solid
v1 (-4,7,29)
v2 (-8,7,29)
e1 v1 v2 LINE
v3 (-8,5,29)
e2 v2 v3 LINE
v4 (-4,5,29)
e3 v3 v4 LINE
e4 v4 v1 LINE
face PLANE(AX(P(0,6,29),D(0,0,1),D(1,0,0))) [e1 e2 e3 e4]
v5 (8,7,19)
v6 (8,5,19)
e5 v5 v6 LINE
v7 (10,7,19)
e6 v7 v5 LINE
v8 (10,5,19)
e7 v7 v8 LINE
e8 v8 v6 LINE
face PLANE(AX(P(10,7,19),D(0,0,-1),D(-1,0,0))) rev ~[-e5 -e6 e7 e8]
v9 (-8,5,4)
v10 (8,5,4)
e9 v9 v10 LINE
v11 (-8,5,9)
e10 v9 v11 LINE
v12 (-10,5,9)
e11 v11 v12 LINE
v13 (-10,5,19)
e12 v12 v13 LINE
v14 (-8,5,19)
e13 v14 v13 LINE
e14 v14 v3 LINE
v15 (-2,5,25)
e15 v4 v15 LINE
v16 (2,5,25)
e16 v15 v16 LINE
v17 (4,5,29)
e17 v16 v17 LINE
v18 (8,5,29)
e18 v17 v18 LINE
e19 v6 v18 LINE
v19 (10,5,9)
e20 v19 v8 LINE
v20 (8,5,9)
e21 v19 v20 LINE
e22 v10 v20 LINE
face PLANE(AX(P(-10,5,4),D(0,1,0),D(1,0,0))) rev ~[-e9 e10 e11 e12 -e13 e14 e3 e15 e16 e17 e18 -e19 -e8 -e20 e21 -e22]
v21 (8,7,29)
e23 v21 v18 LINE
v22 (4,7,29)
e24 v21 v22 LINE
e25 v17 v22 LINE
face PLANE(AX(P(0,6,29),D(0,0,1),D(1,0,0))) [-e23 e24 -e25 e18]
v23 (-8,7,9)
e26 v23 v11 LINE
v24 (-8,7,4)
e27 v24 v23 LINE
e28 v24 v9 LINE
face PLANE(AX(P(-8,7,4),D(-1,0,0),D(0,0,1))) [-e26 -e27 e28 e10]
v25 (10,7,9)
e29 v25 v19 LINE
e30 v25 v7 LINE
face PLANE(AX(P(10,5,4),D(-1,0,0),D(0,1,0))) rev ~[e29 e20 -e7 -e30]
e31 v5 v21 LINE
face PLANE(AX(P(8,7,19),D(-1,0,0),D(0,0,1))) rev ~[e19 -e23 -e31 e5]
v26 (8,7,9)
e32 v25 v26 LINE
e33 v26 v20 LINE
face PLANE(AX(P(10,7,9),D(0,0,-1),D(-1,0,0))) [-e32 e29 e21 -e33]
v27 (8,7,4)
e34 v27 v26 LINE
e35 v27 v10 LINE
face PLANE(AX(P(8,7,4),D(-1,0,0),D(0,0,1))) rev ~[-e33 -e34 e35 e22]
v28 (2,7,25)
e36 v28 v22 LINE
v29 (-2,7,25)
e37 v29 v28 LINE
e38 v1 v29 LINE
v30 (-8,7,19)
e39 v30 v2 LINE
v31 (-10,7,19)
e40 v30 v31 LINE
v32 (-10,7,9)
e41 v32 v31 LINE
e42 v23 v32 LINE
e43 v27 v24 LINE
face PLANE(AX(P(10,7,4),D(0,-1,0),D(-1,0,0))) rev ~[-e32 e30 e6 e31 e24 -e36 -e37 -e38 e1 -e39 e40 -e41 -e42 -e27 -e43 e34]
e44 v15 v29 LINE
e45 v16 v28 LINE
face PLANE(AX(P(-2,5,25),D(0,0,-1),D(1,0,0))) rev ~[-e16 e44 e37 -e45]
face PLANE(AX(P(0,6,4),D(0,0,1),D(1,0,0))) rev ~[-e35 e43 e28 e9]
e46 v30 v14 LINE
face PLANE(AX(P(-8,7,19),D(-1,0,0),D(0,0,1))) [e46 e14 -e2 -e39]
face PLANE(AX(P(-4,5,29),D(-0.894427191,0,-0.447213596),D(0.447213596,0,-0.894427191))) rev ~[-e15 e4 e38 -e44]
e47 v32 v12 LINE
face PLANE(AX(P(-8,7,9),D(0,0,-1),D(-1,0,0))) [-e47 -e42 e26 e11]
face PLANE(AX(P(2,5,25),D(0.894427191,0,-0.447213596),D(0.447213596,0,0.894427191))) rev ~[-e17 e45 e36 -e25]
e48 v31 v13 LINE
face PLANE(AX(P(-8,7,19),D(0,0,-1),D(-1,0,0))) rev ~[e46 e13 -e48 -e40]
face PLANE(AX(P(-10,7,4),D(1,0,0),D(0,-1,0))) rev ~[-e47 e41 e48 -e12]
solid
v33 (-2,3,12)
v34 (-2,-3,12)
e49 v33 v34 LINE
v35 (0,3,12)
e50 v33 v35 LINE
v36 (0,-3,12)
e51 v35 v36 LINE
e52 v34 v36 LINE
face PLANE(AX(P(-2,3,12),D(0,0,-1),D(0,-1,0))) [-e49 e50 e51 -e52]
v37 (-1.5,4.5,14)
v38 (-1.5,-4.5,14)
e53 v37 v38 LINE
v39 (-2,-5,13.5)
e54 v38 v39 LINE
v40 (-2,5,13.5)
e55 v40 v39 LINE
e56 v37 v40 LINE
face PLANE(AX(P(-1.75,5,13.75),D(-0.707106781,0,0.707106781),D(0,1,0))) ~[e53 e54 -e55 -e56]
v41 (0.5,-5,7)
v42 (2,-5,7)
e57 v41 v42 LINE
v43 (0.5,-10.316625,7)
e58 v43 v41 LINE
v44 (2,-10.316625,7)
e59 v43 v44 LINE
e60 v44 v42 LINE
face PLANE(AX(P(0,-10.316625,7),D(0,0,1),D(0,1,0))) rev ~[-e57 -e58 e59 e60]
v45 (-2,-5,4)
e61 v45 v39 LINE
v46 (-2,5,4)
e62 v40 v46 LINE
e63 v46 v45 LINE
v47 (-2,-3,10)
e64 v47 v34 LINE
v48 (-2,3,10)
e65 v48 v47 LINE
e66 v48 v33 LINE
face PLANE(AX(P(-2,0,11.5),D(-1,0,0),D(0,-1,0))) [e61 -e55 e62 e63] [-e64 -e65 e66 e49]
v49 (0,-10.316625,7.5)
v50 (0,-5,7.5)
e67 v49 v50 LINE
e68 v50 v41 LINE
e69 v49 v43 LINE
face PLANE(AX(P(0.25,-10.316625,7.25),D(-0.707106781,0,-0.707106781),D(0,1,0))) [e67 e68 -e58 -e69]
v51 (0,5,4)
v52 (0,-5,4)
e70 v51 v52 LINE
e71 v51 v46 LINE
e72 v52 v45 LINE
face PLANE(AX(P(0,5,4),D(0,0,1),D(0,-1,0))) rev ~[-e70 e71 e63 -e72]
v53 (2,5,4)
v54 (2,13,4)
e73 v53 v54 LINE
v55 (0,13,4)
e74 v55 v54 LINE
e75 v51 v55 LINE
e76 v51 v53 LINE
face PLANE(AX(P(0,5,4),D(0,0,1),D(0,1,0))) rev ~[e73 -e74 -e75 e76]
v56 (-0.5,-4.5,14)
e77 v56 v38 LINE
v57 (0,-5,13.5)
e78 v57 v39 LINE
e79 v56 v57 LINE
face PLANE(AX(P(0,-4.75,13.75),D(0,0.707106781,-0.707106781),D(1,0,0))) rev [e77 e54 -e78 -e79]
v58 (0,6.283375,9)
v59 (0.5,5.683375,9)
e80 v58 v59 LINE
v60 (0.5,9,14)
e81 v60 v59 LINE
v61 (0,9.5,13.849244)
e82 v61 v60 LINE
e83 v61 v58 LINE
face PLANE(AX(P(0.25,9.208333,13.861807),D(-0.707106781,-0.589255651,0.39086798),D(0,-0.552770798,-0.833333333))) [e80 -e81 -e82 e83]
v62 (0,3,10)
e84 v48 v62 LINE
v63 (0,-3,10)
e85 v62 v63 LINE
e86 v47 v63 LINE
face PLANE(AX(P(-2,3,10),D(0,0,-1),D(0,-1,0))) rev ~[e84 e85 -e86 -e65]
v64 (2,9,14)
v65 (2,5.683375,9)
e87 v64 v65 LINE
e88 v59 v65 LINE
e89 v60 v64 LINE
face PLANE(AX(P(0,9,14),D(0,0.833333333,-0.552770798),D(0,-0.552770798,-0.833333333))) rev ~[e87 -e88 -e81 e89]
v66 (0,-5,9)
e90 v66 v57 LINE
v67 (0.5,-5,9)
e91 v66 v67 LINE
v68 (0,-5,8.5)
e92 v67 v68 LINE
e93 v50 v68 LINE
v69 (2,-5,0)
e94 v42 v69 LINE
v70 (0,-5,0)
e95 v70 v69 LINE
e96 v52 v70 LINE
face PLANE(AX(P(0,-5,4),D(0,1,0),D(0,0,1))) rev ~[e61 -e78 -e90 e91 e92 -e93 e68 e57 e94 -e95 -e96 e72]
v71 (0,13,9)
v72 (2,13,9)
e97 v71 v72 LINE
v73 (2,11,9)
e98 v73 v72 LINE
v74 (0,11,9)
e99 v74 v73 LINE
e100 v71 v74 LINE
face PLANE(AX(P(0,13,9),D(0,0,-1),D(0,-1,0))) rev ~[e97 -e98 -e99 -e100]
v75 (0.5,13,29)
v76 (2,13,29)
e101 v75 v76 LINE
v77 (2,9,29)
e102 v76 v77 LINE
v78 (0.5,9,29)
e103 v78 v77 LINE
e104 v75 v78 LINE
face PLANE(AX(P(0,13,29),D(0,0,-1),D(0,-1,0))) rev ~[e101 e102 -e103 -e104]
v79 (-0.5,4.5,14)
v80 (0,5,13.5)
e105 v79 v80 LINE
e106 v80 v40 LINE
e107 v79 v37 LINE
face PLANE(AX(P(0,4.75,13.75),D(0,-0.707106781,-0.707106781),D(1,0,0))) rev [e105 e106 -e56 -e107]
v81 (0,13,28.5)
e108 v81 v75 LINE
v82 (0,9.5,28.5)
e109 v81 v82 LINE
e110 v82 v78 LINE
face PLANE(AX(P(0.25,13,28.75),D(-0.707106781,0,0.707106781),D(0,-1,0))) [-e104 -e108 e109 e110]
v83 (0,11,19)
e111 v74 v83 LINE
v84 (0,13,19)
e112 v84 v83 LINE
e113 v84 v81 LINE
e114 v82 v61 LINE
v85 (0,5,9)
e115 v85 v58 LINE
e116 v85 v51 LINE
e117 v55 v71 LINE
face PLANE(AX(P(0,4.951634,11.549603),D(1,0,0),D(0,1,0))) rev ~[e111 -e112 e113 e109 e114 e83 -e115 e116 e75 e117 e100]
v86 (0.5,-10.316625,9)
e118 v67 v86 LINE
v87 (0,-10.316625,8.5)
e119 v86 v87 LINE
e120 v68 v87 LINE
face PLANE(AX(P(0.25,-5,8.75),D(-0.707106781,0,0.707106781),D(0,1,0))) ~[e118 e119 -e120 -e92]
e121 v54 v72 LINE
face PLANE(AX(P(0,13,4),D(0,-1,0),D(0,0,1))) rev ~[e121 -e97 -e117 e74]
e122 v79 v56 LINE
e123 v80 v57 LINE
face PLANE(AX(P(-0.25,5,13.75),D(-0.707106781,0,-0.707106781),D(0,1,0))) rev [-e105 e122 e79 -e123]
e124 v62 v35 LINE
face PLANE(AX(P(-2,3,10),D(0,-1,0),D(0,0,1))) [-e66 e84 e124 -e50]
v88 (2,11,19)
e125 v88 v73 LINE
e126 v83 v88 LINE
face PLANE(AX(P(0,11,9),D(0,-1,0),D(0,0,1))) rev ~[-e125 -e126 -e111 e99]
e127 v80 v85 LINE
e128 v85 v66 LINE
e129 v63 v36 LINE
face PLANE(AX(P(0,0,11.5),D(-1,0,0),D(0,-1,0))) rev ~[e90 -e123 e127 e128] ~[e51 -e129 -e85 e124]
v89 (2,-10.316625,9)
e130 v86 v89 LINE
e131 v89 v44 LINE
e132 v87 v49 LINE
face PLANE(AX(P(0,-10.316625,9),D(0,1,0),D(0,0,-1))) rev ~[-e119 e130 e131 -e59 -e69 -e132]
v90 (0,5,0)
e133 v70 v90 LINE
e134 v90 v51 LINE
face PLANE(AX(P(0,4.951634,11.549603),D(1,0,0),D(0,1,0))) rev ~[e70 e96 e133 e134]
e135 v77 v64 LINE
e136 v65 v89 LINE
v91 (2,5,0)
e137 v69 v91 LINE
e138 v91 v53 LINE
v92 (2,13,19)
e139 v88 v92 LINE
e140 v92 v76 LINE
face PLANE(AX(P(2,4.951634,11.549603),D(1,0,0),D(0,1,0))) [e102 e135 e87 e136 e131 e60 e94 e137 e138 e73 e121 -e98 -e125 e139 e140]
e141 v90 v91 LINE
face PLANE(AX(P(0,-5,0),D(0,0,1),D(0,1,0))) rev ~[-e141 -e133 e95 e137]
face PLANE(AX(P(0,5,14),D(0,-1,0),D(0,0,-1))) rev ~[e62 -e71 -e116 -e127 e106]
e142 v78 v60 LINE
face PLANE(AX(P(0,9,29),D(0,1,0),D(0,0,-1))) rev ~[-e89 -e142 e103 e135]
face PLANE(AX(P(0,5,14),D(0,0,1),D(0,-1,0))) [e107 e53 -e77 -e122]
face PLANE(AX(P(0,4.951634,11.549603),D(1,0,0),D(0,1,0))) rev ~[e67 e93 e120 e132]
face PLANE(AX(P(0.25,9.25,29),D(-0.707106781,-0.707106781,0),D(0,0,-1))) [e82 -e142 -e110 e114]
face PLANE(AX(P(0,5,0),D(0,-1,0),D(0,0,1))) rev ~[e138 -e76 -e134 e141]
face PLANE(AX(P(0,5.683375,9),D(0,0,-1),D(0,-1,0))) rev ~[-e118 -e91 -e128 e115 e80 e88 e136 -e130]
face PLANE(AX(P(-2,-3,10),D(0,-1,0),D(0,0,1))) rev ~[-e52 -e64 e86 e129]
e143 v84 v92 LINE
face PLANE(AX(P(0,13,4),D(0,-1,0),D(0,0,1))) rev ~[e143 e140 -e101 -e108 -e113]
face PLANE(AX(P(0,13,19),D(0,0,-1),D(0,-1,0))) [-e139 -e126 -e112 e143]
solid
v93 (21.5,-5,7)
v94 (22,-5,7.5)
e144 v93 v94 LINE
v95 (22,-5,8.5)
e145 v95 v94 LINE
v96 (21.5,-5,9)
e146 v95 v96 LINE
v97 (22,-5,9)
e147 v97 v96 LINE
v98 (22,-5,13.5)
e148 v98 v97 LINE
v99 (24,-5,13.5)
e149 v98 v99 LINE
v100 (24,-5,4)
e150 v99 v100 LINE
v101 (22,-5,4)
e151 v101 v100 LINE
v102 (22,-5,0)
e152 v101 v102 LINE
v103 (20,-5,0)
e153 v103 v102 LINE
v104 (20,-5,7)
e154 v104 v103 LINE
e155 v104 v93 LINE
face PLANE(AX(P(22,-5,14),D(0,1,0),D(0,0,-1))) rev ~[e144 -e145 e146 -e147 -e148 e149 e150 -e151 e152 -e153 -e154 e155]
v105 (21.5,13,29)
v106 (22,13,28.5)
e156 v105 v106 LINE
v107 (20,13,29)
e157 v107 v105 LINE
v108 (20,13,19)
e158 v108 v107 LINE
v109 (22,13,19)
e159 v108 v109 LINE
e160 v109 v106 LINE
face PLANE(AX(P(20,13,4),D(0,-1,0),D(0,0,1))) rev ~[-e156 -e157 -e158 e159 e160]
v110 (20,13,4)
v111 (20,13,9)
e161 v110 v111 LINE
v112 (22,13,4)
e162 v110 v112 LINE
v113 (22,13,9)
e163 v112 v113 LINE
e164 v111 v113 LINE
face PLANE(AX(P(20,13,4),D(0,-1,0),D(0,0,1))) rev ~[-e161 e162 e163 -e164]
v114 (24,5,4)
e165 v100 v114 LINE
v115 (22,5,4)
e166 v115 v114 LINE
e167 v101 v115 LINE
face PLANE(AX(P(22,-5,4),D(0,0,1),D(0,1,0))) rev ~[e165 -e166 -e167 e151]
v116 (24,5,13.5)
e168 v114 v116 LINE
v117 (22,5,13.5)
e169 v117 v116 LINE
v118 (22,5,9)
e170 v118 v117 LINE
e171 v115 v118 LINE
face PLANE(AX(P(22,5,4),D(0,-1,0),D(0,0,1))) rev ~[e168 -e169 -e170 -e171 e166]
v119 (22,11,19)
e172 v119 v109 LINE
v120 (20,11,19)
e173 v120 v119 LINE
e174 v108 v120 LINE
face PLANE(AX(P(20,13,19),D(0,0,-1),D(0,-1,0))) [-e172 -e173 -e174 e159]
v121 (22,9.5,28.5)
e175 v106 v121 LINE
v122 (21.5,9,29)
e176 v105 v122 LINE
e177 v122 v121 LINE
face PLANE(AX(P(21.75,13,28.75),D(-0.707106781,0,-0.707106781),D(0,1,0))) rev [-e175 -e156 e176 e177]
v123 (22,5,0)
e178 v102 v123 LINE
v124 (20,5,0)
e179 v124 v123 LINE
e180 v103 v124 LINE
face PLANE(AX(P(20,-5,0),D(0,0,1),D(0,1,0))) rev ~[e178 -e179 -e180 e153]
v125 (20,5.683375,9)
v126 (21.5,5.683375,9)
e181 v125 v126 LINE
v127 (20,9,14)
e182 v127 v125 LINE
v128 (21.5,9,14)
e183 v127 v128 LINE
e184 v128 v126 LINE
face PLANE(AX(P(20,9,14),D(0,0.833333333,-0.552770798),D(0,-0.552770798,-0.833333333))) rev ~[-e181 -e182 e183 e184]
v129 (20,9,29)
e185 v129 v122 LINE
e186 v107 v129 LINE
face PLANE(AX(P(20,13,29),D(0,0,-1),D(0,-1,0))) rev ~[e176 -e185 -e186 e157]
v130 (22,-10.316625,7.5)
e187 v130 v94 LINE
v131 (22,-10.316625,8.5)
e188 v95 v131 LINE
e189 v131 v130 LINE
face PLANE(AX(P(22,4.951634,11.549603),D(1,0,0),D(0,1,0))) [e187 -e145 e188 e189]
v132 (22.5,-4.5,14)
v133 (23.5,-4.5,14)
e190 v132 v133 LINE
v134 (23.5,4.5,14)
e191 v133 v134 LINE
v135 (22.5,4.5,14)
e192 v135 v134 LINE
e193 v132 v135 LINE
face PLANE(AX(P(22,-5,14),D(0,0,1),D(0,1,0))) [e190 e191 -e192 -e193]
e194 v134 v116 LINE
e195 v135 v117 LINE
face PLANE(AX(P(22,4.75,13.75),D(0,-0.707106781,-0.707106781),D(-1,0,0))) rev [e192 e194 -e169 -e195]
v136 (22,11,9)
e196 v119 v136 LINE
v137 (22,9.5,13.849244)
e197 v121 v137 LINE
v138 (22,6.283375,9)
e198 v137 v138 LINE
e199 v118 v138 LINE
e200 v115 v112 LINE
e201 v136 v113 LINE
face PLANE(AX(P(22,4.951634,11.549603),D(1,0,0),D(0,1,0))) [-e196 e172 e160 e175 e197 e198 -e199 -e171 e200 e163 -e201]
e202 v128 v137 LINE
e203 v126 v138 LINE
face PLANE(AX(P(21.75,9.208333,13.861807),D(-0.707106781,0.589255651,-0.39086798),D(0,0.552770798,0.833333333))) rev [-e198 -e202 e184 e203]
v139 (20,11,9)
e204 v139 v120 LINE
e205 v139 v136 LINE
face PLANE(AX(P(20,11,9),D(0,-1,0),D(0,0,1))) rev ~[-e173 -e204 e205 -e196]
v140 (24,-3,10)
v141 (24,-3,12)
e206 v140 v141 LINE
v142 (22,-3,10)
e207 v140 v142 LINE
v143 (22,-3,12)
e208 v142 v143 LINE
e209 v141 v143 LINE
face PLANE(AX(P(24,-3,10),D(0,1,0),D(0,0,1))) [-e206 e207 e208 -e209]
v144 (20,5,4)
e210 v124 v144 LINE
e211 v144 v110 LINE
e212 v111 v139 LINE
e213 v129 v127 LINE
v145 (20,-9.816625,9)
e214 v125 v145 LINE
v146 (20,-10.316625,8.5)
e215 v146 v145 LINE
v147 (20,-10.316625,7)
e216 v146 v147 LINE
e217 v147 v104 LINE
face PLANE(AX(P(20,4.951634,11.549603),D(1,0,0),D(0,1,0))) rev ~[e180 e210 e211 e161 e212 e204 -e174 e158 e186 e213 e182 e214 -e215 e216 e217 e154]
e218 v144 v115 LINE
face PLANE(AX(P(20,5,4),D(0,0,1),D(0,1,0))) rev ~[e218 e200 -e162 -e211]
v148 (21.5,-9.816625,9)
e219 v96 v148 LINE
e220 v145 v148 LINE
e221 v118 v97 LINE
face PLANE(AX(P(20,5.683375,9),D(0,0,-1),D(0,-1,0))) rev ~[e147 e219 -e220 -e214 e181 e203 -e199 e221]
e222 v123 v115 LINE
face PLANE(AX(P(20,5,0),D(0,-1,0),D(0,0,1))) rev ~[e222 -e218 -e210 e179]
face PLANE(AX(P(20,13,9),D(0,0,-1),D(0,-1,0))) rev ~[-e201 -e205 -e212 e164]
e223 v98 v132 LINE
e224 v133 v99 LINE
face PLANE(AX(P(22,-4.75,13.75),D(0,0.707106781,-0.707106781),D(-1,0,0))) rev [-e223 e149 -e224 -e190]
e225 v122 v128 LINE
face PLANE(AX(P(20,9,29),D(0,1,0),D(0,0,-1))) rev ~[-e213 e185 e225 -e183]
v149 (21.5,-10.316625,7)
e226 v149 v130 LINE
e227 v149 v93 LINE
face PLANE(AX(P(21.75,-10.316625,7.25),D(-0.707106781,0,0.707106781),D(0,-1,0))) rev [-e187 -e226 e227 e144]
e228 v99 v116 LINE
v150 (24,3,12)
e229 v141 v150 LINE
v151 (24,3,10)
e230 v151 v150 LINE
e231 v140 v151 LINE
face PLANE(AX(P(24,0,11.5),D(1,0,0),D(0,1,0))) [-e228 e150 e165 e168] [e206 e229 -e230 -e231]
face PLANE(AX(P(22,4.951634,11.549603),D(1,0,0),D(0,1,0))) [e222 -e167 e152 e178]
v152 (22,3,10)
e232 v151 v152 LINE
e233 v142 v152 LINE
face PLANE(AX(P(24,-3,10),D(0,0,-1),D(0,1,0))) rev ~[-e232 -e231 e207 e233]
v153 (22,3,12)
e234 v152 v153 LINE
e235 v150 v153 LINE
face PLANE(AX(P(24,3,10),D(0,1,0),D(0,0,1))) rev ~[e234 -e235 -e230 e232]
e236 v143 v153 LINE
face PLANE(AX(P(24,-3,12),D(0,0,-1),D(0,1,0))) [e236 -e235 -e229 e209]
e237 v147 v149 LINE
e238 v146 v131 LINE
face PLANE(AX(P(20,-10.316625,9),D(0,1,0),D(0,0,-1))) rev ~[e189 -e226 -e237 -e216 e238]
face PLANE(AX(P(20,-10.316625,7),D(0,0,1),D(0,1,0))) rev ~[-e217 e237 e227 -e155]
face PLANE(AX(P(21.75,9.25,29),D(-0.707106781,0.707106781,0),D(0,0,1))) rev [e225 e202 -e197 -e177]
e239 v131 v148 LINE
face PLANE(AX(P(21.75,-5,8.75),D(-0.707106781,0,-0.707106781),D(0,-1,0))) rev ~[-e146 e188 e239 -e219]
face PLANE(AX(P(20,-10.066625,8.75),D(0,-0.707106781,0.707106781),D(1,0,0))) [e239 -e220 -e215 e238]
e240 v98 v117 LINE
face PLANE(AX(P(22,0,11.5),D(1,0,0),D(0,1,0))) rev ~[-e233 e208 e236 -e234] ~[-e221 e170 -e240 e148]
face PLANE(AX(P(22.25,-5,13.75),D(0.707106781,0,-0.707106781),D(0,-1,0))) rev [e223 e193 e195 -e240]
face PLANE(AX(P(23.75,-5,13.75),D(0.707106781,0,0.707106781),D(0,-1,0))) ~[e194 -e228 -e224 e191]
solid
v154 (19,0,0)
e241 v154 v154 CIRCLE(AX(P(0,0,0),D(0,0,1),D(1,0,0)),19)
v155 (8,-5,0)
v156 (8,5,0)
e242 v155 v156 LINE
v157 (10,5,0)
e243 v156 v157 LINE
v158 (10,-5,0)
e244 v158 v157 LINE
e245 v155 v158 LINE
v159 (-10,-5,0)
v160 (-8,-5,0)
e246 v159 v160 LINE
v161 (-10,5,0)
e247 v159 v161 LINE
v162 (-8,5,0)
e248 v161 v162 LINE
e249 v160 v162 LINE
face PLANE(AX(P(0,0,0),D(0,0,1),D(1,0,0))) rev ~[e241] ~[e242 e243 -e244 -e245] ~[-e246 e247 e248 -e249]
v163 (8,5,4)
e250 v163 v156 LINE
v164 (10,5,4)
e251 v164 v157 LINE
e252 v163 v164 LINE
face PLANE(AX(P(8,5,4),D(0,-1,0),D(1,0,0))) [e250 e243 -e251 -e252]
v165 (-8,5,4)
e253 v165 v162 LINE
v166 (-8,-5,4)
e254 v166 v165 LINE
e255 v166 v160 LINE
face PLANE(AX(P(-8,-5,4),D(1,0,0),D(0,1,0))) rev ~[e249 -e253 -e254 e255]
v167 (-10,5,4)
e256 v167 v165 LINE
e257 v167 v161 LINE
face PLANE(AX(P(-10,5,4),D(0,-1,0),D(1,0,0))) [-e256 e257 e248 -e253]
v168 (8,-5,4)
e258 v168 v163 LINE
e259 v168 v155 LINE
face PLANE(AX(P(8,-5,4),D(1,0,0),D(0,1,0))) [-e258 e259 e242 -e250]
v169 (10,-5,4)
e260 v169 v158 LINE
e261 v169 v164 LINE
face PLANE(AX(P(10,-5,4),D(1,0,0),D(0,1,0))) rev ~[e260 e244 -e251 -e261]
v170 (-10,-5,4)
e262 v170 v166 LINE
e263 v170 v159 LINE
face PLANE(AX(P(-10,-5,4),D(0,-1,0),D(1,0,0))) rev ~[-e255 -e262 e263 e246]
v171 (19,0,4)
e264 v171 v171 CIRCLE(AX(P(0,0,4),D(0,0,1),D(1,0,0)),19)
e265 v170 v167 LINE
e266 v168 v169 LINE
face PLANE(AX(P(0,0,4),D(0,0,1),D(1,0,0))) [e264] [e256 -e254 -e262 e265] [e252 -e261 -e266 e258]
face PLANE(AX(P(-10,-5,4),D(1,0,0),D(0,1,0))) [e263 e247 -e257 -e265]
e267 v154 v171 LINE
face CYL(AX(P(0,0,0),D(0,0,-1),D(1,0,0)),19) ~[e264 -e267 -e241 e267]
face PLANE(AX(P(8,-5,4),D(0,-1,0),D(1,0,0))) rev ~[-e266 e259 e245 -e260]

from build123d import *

# Parameters (mm, degrees)
F0_R       = 19
F1_DEPTH   = 4
F2_W       = 2
F2_H       = 10
F3_DEPTH   = 4.001
F5_DEPTH   = 2
F8_DEPTH   = 25
F9_W       = 2
F9_H       = 10
F9_H_2     = 5
F10_DEPTH  = 26.001
F6_W       = 2
F6_H       = 10
F11_DEPTH  = 19.001
F13_DEPTH  = 14.001
F15_W      = 10
F15_H      = 5
F16_DEPTH  = 2
F17_W      = 6
F17_H      = 2
F18_DEPTH  = 24.001
F19_W      = 10
F19_H      = 5
F20_DEPTH  = 2
F21_W      = 6
F21_H      = 2
F22_DEPTH  = 43.001
F23_SIZE   = 0.5
F23_2_SIZE = 0.5


with BuildPart() as f1:
    # F0 (on Top) → F1 (new body)
    with BuildSketch(Plane.XY):
        Circle(F0_R)
    extrude(amount=F1_DEPTH)

    # F2 (on face) → F3 (cut, through all)
    with BuildSketch(Plane.XY.offset(4)):
        with Locations((-9, 0)):
            Rectangle(F2_W, F2_H)
        with Locations((9, 0)):
            Rectangle(F2_W, F2_H)
    extrude(amount=-F3_DEPTH, mode=Mode.SUBTRACT)


with BuildPart() as f5:
    # F4 (on Right) → F5 (new body)
    with BuildSketch(Plane.YZ):
        Polygon((-5, 4), (-5, 0), (5, 0), (5, 4), (13, 4), (13, 29), (9, 29), (9, 14), (5.6833752096, 9), (-10.3166247904, 9), (-10.3166247904, 7), (-5, 7), align=None)
    extrude(amount=F5_DEPTH)

    # F6 (on face) → F11 (cut, through all)
    with BuildSketch(Plane(origin=(0, 0, 0), x_dir=(0, -1, 0), z_dir=(-1, 0, 0))):
        with Locations((-12, 14)):
            Rectangle(F6_W, F6_H)
    extrude(amount=-F11_DEPTH, mode=Mode.SUBTRACT)


with BuildPart() as f8:
    # F7 (on face) → F8 (new body)
    with BuildSketch(Plane.XY.offset(4)):
        Polygon((-10, 7), (-10, 5), (-8, 5), (8, 5), (10, 5), (10, 7), align=None)
    extrude(amount=F8_DEPTH)

    # F9 (on face) → F10 (cut, through all)
    with BuildSketch(Plane(origin=(0, 7, 0), x_dir=(-1, 0, 0), z_dir=(0, 1, 0))):
        with Locations((-9, 24)):
            Rectangle(F9_W, F9_H)
        with Locations((9, 24)):
            Rectangle(F9_W, F9_H)
        with Locations((9, 6.5)):
            Rectangle(F9_W, F9_H_2)
        with Locations((-9, 6.5)):
            Rectangle(F9_W, F9_H_2)
    extrude(amount=-F10_DEPTH, mode=Mode.SUBTRACT)

    # F12 (on face) → F13 (cut, through all)
    with BuildSketch(Plane.XZ.offset(-5)):
        Polygon((4, 29), (-4, 29), (-2, 25), (2, 25), align=None)
    extrude(amount=-F13_DEPTH, mode=Mode.SUBTRACT)


with BuildPart() as f14_1:
    # F14: copy of F5
    add(f5.part.moved(Location((20, 0, 0))))

    # F19 (on face) → F20 (join)
    with BuildSketch(Plane.YZ.offset(22)):
        with Locations((0, 11.5)):
            Rectangle(F19_W, F19_H)
        Polygon((-5, 4), (5, 4), (5, 9), (-5, 9), (-5, 7), align=None)
    extrude(amount=F20_DEPTH)

    # F21 (on face) → F22 (cut, through all)
    with BuildSketch(Plane.YZ.offset(24)):
        with Locations((0, 11)):
            Rectangle(F21_W, F21_H)
    extrude(amount=-F22_DEPTH, mode=Mode.SUBTRACT)

    # F23#2
    f23_2_edges = [f14_1.edges().sort_by_distance(p)[0] for p in [
        (24, 0, 14),
        (23, -5, 14),
        (23, 5, 14),
        (22, 0, 14),
        (22, -7.658312, 9),
        (21, -10.316625, 9),
        (22, 7.341688, 11.5),
        (22, 9, 21.5),
        (22, 11, 29),
        (22, -7.658312, 7),
    ]]
    chamfer(f23_2_edges, length=F23_2_SIZE)


with BuildPart() as f5_1:
    add(f5.part)

    # F15 (on face) → F16 (join)
    with BuildSketch(Plane(origin=(0, 0, 0), x_dir=(0, -1, 0), z_dir=(-1, 0, 0))):
        with Locations((0, 11.5)):
            Rectangle(F15_W, F15_H)
        Polygon((-5, 9), (-5, 4), (5, 4), (5, 7), (5, 9), align=None)
    extrude(amount=F16_DEPTH)

    # F17 (on face) → F18 (cut, through all)
    with BuildSketch(Plane(origin=(-2, 0, 0), x_dir=(0, -1, 0), z_dir=(-1, 0, 0))):
        with Locations((0, 11)):
            Rectangle(F17_W, F17_H)
    extrude(amount=-F18_DEPTH, mode=Mode.SUBTRACT)

    # F23
    f23_edges = [f5_1.edges().sort_by_distance(p)[0] for p in [
        (0, -7.658312, 9),
        (0, 0, 14),
        (-1, -5, 14),
        (-2, 0, 14),
        (-1, 5, 14),
        (0, 7.341688, 11.5),
        (0, 9, 21.5),
        (0, 11, 29),
        (0, -7.658312, 7),
    ]]
    chamfer(f23_edges, length=F23_SIZE)


solid = Compound([f1.part, f8.part, f14_1.part, f5_1.part])
